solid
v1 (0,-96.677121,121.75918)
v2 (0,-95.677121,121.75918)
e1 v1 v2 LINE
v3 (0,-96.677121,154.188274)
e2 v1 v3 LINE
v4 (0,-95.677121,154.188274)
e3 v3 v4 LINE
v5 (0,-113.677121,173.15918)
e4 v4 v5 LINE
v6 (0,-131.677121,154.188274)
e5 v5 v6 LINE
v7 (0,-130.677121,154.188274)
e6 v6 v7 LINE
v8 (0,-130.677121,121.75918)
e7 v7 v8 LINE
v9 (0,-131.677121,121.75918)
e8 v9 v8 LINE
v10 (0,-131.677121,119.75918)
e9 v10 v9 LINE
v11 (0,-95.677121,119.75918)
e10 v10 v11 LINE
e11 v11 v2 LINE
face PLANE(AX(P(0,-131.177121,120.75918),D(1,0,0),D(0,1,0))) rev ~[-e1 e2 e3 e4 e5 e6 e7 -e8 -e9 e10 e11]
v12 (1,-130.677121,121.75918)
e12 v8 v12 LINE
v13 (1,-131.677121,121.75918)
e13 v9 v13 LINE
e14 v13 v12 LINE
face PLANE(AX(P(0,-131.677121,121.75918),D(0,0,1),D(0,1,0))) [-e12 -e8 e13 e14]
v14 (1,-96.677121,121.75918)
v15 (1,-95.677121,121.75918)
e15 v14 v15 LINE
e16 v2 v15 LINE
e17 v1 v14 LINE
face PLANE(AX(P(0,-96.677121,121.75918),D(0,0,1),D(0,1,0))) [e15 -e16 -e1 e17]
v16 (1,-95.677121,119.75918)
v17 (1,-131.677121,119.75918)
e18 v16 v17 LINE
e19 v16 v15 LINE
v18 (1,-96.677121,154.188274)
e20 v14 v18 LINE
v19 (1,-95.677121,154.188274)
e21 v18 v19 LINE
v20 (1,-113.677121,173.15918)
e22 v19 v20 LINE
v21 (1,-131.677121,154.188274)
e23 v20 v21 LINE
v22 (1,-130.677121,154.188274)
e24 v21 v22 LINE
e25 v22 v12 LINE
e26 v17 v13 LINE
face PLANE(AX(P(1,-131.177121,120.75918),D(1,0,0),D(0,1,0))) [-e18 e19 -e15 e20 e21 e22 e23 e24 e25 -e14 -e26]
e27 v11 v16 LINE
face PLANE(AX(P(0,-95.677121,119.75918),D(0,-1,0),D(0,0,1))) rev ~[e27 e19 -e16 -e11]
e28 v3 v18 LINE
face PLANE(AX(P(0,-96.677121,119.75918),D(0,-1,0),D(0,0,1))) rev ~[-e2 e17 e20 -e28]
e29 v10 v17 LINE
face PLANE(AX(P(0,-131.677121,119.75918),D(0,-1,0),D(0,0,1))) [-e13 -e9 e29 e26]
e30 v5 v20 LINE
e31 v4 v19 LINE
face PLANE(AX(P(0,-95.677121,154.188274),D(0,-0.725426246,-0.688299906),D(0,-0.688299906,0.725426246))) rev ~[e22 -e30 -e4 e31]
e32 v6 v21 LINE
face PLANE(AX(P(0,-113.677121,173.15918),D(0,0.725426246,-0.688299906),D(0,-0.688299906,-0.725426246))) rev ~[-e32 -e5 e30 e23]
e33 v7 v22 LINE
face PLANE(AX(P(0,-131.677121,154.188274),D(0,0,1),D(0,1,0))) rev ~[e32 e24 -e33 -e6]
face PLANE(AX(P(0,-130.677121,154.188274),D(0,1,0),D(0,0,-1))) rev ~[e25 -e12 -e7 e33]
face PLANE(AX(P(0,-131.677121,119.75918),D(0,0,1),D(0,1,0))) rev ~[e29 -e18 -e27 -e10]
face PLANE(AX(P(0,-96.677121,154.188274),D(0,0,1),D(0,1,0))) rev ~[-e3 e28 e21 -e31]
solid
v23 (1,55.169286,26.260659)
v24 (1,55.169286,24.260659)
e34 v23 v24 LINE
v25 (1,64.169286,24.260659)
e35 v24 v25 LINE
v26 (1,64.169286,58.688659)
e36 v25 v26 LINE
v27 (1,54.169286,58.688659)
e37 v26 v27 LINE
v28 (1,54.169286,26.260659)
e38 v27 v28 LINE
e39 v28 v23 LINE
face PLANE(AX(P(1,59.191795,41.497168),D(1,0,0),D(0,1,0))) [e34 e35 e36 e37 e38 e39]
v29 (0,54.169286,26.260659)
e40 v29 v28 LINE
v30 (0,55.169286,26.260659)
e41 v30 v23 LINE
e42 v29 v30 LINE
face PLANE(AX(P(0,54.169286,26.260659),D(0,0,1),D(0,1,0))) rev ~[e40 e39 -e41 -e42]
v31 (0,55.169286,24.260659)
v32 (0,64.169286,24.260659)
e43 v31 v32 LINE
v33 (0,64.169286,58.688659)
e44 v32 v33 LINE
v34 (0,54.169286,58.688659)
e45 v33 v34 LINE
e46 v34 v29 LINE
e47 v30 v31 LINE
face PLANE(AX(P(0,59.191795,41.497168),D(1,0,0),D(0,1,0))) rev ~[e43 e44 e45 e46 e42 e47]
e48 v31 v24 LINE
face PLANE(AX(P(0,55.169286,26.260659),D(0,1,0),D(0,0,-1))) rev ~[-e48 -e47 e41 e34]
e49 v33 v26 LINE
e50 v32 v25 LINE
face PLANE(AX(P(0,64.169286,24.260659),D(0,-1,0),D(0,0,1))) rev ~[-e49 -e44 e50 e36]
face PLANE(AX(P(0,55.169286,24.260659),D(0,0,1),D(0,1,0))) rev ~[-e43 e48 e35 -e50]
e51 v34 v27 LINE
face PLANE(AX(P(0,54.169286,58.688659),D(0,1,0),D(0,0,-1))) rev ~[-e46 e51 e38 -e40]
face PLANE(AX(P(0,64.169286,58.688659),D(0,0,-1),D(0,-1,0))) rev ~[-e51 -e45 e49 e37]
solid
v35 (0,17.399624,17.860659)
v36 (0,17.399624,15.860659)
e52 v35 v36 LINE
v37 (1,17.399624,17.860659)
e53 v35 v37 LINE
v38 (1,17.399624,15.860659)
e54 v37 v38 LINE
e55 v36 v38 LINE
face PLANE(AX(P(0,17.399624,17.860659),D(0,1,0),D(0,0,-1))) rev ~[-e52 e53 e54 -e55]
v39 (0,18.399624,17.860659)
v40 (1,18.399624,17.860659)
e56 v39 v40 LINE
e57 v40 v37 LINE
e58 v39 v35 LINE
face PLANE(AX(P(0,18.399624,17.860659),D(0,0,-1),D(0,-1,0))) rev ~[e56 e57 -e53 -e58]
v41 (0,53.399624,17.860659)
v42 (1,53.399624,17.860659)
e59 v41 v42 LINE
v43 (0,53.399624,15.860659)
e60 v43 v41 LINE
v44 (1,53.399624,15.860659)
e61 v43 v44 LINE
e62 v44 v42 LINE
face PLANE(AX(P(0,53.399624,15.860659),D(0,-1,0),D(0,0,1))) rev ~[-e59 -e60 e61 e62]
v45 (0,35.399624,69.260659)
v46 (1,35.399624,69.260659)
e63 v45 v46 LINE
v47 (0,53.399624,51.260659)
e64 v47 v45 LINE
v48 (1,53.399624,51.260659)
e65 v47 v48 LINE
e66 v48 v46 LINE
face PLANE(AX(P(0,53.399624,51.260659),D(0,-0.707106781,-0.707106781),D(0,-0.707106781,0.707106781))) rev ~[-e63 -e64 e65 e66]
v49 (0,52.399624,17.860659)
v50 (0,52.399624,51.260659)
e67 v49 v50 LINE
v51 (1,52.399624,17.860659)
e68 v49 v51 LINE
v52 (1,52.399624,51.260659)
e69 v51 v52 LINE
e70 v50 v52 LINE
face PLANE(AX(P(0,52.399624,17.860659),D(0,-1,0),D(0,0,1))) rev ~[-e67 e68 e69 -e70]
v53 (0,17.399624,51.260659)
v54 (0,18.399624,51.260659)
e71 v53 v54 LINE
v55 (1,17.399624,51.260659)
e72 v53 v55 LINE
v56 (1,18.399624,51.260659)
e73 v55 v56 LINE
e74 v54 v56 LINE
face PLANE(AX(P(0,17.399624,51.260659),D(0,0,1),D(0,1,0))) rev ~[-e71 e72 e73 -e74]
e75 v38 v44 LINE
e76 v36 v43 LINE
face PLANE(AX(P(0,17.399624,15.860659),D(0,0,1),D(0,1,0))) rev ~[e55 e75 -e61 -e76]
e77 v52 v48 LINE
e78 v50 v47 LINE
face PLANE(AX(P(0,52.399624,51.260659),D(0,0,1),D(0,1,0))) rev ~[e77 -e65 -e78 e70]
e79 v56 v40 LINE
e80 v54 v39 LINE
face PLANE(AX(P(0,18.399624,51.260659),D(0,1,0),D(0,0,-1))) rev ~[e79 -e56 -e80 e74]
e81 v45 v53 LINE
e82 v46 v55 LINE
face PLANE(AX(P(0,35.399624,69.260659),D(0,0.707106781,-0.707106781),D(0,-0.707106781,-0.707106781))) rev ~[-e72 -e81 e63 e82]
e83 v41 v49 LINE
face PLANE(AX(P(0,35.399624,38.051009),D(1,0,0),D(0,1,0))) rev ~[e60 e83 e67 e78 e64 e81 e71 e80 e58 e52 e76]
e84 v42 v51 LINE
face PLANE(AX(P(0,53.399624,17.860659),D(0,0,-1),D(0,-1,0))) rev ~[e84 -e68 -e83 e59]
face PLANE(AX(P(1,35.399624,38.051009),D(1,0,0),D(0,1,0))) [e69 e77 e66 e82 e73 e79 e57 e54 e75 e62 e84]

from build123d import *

# Parameters (mm, degrees)
F1_DEPTH = 1
F2_DEPTH = 1
F0_W     = 1
F0_H     = 2
F3_DEPTH = 1


with BuildPart() as f1:
    # F0 (on Right) → F1 (new body)
    with BuildSketch(Plane.YZ):
        Polygon((53.3996237096, 51.2606592213), (35.3996237096, 69.2606592213), (17.3996237096, 51.2606592213), (18.3996237096, 51.2606592213), (18.3996237096, 26.2606592213), (18.3996237096, 17.8606592213), (17.3996237096, 17.8606592213), (17.3996237096, 15.8606592213), (53.3996237096, 15.8606592213), (53.3996237096, 17.8606592213), (52.3996237096, 17.8606592213), (52.3996237096, 24.2606592213), (52.3996237096, 26.2606592213), (52.3996237096, 51.2606592213), align=None)
    extrude(amount=F1_DEPTH)


with BuildPart() as f1b:
    # F0 (on Right) → F1, piece 2 (new body)
    with BuildSketch(Plane.YZ):
        Polygon((55.1692863107, 26.2606592213), (55.1692863107, 24.2606592213), (62.1692863107, 24.2606592213), (64.1692863107, 24.2606592213), (64.1692863107, 58.6886592213), (62.1692863107, 58.6886592213), (54.1692863107, 58.6886592213), (54.1692863107, 56.6886592213), (54.1692863107, 26.2606592213), align=None)
    extrude(amount=F1_DEPTH)


with BuildPart() as f1c:
    # F0 (on Right) → F1, piece 3 (new body)
    with BuildSketch(Plane.YZ):
        Polygon((-113.677120924, 154.1882742229), (-130.677120924, 154.1882742229), (-130.677120924, 121.7591796517), (-130.677120924, 119.7591796517), (-113.677120924, 119.7591796517), align=None)
    extrude(amount=F1_DEPTH)

    # F0 (on Right) → F2 (join)
    with BuildSketch(Plane.YZ):
        Polygon((-96.677120924, 154.1882742229), (-113.677120924, 154.1882742229), (-113.677120924, 119.7591796517), (-96.677120924, 119.7591796517), (-96.677120924, 121.7591796517), align=None)
        Polygon((-95.677120924, 154.1882742229), (-113.677120924, 173.1591796517), (-113.677120924, 154.1882742229), (-96.677120924, 154.1882742229), align=None)
        Polygon((-113.677120924, 173.1591796517), (-131.677120924, 154.1882742229), (-130.677120924, 154.1882742229), (-113.677120924, 154.1882742229), align=None)
        Polygon((-113.677120924, 154.1882742229), (-130.677120924, 154.1882742229), (-130.677120924, 121.7591796517), (-130.677120924, 119.7591796517), (-113.677120924, 119.7591796517), align=None)
    extrude(amount=F2_DEPTH)

    # F0 (on Right) → F3 (join)
    with BuildSketch(Plane.YZ):
        with Locations((-131.177120924, 120.7591796517)):
            Rectangle(F0_W, F0_H)
        with Locations((-96.177120924, 120.7591796517)):
            Rectangle(F0_W, F0_H)
    extrude(amount=F3_DEPTH)


solid = Compound([f1.part, f1b.part, f1c.part])
